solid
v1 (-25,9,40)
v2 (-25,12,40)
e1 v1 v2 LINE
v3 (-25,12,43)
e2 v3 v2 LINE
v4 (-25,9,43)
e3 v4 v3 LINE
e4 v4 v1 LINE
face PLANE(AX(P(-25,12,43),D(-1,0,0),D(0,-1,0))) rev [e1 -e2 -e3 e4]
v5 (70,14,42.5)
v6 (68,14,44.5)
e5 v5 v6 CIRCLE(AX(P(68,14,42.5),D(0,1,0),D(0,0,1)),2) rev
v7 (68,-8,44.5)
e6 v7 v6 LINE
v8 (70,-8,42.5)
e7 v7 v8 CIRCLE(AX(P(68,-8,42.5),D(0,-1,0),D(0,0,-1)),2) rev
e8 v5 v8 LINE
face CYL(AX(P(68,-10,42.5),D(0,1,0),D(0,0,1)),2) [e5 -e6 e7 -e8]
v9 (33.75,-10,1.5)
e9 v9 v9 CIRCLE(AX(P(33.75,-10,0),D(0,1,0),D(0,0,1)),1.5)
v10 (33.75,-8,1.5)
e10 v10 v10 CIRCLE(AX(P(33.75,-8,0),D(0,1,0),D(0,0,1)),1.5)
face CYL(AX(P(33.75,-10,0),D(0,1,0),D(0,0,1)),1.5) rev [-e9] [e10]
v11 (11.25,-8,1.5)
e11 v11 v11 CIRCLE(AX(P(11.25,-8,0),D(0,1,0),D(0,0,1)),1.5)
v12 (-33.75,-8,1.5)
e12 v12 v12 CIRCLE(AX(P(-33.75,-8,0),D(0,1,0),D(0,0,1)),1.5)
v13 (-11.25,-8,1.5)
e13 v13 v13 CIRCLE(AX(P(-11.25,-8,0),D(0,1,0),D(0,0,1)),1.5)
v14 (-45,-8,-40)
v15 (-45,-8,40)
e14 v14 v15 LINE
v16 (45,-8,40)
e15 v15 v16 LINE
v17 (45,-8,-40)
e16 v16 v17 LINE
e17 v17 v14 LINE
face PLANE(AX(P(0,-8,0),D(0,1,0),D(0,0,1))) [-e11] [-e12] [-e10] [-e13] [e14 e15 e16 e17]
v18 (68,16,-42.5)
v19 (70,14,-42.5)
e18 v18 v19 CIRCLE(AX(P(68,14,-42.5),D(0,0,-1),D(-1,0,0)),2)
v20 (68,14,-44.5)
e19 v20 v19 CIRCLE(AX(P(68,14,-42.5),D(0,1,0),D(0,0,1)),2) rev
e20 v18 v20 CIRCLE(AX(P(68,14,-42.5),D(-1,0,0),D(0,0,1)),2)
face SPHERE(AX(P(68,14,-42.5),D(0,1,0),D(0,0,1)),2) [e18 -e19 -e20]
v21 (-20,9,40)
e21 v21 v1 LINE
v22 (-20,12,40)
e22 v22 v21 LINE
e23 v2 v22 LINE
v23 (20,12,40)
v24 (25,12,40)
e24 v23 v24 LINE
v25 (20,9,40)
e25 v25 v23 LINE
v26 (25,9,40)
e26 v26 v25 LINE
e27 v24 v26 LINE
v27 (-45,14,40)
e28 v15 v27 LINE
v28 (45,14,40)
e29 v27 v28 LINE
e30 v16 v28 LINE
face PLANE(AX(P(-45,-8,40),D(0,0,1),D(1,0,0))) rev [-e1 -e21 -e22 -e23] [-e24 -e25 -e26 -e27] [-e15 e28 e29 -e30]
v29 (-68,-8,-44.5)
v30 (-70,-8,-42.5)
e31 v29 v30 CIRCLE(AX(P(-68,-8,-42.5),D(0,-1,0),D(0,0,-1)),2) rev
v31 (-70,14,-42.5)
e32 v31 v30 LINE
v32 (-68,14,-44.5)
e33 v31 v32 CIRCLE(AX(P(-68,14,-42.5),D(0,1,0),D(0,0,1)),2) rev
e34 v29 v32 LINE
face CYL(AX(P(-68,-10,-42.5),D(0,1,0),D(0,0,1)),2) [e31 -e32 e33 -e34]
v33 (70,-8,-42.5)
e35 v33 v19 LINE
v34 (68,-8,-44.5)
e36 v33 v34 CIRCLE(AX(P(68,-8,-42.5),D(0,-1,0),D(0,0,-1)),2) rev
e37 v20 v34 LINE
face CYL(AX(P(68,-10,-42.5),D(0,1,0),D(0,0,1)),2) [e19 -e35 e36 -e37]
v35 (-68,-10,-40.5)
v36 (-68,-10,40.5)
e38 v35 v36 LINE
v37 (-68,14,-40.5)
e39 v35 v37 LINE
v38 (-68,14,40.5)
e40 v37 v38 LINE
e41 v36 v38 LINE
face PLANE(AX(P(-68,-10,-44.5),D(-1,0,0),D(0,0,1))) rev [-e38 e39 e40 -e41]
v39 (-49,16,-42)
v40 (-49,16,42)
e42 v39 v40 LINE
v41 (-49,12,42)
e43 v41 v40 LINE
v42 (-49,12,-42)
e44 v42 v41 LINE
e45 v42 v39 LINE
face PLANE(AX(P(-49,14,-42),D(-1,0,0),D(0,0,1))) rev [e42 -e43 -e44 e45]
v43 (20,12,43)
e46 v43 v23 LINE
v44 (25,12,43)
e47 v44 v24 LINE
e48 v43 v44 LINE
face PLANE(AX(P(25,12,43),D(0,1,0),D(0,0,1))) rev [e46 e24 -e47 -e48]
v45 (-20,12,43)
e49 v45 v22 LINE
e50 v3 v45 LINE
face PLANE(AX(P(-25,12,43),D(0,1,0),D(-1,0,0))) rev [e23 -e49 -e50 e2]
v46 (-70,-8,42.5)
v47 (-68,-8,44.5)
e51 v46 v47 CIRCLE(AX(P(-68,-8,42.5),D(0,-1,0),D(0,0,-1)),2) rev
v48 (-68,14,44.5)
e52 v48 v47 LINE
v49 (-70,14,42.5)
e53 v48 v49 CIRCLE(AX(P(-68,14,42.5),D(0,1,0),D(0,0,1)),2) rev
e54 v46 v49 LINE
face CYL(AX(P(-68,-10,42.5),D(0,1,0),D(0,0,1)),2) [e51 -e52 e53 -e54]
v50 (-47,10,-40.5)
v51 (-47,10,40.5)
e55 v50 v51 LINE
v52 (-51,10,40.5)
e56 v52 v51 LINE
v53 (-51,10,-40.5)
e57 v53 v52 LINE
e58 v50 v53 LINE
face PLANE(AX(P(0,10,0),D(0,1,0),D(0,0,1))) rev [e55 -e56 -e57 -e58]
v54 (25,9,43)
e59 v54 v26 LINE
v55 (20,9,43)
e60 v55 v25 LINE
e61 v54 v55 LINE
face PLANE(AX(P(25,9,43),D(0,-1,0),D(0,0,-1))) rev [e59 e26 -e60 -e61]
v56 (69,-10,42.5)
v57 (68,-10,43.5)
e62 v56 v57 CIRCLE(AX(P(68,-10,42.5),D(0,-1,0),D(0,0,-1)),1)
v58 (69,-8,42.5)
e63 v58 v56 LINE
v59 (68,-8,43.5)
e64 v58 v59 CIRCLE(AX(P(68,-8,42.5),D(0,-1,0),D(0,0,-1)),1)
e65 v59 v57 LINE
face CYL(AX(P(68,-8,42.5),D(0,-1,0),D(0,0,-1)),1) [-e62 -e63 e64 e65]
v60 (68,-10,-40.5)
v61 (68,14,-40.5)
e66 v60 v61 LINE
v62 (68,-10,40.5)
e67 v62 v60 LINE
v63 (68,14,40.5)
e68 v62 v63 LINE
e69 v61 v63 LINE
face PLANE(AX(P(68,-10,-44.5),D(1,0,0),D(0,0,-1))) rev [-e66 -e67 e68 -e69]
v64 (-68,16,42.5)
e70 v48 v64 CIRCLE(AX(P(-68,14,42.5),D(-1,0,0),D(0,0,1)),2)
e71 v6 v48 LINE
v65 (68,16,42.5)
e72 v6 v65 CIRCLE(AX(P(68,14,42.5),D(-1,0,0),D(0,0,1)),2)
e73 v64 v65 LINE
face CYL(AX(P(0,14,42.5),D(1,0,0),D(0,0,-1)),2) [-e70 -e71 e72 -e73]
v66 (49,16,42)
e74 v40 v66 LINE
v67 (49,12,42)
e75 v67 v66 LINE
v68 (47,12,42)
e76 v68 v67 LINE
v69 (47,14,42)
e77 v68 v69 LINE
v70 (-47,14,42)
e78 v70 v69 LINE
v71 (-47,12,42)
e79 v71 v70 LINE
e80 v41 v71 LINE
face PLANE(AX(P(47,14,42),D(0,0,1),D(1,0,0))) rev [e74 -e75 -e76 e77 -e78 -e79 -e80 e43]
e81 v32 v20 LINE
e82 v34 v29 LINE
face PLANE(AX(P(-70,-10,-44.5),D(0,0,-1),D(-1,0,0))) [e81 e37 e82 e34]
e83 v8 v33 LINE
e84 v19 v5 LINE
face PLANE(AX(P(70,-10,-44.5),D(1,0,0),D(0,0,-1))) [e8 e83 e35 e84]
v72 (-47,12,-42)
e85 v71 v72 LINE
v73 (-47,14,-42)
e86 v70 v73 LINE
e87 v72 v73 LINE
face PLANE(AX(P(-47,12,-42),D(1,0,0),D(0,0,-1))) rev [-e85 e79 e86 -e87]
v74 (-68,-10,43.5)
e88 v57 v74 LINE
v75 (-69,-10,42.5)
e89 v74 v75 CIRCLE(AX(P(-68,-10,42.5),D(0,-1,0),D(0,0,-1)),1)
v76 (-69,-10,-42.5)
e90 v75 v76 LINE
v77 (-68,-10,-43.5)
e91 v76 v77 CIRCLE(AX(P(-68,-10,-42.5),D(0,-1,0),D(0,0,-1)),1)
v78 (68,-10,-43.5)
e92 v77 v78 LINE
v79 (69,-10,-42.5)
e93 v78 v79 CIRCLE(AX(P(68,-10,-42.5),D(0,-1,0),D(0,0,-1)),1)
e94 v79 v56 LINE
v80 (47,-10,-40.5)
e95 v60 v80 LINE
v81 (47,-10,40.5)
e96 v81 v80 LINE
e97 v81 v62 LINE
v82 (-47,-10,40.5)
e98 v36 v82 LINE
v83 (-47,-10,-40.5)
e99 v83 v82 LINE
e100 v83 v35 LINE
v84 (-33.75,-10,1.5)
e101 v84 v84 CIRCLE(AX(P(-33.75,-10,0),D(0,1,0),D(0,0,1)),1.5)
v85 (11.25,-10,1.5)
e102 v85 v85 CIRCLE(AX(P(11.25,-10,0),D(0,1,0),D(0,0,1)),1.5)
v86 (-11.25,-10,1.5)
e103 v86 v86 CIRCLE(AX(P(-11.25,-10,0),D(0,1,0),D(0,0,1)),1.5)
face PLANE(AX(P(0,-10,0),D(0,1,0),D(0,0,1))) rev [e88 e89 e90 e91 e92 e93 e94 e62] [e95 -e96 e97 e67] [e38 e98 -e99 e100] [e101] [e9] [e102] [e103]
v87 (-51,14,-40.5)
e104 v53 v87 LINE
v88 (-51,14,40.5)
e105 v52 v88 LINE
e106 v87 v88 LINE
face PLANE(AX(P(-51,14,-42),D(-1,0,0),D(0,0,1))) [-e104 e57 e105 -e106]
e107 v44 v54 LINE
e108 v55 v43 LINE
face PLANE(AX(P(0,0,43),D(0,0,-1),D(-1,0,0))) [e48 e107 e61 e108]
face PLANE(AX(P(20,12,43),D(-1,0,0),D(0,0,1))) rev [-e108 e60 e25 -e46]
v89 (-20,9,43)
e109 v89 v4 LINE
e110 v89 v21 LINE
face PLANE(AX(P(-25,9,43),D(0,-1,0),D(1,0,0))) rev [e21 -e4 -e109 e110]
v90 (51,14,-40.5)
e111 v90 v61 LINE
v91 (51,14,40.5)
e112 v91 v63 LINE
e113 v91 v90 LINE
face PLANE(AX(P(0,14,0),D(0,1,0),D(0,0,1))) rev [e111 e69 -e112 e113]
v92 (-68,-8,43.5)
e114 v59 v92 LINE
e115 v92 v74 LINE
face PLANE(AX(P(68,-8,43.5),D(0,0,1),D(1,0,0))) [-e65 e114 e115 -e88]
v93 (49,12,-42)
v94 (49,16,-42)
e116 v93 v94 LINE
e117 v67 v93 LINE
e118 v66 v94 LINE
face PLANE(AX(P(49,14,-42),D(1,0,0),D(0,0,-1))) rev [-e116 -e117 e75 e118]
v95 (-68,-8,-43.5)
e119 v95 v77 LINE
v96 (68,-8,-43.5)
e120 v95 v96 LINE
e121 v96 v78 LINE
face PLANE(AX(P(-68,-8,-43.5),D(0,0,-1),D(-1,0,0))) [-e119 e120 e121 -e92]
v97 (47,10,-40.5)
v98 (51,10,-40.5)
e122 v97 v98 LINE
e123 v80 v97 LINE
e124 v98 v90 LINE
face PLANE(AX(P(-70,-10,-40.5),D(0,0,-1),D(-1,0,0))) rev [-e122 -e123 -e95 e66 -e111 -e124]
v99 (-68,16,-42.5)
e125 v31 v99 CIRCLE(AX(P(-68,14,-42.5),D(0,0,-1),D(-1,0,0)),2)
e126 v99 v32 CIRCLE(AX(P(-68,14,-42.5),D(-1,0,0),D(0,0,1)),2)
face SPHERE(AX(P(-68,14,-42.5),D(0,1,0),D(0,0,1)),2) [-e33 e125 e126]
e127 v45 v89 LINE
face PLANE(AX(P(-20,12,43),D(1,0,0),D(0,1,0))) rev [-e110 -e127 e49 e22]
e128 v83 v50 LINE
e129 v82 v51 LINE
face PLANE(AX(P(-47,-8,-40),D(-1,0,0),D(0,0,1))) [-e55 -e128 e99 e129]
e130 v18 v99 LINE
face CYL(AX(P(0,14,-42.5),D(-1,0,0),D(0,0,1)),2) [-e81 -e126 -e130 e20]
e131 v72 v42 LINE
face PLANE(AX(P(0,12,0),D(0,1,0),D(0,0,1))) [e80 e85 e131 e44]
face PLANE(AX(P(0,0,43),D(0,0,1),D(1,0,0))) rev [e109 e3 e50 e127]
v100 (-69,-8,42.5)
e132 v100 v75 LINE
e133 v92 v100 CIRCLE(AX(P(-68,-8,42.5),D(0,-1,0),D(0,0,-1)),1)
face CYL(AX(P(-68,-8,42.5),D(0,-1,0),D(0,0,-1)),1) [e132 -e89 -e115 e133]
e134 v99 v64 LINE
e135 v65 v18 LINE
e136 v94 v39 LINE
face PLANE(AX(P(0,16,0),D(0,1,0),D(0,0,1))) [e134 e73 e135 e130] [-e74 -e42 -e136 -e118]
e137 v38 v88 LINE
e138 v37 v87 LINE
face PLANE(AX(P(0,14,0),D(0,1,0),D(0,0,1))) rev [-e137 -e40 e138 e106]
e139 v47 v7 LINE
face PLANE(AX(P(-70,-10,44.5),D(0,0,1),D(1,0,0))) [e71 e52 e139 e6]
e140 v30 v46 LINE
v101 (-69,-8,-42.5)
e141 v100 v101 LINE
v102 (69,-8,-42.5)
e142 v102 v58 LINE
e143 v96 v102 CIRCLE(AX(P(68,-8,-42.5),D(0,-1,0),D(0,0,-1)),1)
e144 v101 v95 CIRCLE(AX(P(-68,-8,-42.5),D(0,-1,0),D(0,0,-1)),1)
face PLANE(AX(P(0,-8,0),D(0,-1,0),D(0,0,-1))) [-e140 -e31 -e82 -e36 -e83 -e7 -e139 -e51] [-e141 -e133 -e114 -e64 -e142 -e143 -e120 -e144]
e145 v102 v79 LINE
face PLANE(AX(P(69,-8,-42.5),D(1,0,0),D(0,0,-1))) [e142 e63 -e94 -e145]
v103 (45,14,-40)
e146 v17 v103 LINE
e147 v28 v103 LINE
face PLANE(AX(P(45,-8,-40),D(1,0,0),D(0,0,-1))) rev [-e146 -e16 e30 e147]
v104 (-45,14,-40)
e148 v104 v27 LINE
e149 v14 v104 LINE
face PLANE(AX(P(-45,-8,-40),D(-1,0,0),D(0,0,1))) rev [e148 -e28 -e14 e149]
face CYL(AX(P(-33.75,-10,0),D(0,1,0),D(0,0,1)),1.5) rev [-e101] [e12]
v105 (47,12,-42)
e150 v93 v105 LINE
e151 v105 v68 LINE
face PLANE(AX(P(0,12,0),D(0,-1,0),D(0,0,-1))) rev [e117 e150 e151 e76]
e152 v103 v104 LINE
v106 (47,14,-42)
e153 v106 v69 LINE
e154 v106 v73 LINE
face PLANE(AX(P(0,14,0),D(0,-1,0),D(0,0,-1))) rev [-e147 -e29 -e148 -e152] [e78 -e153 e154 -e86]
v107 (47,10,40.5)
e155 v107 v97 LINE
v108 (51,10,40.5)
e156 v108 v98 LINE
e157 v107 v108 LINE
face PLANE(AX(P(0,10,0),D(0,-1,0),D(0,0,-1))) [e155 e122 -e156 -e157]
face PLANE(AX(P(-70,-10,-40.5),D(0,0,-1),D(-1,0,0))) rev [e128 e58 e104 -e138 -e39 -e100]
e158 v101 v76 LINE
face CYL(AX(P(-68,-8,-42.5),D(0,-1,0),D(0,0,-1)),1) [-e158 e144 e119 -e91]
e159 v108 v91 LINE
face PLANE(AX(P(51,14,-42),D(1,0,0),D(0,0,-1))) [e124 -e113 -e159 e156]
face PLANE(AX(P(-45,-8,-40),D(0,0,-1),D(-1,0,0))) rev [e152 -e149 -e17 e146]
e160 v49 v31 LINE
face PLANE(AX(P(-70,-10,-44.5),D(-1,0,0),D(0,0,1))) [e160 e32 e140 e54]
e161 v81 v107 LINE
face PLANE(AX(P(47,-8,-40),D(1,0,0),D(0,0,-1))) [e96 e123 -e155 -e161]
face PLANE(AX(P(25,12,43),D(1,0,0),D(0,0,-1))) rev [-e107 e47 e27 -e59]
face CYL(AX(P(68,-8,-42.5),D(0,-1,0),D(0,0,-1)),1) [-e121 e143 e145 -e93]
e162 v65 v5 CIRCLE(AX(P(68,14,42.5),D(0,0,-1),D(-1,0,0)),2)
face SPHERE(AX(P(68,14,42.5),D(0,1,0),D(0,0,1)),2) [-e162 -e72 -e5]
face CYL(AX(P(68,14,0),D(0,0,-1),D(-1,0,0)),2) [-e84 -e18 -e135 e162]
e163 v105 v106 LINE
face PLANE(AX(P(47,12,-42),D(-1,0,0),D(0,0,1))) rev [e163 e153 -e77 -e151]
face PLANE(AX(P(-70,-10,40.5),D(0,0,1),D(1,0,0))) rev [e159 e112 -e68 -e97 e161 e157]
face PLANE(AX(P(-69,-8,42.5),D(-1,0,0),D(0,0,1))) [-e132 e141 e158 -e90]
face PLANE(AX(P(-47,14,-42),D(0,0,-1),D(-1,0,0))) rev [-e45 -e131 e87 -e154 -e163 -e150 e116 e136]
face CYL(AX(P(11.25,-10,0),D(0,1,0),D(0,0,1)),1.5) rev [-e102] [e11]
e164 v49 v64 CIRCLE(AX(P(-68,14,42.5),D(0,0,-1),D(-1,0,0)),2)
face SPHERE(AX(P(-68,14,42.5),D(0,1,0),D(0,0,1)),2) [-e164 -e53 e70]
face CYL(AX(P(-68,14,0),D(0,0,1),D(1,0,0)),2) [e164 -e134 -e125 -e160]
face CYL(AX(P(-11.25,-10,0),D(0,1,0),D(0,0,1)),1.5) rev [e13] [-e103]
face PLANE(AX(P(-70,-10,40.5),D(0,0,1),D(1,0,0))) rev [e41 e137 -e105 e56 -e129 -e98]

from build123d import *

# Parameters (mm, degrees)
BOSS_EXTRUDE1_DEPTH      = 16
BOSS_EXTRUDE1_DEPTH_BACK = 10
SKETCH1_W                = 140
SKETCH1_H                = 89
SKETCH2_W                = 94
SKETCH2_H                = 84
BOSS_EXTRUDE2_DEPTH      = 22
SKETCH3_W                = 90
SKETCH3_H                = 80
CUT_EXTRUDE2_DEPTH       = 24
SKETCH5_R                = 1.5
CUT_EXTRUDE4_DEPTH       = 2
FILLET1_R                = 2
FILLET2_R                = 2
CUT_EXTRUDE8_DEPTH       = 2
SKETCH10_W               = 5
SKETCH10_H               = 3
CUT_EXTRUDE9_DEPTH       = 3
SKETCH11_W               = 2
SKETCH11_H               = 84
CUT_EXTRUDE10_DEPTH      = 2
SHELL1_START             = -68
SHELL1_OUTLINE_W         = 20
SHELL1_OUTLINE_H         = 81
SHELL1_DEPTH             = 21
SHELL1_START_2           = 47
SHELL1_2_OUTLINE_W       = 20
SHELL1_2_OUTLINE_H       = 81
SHELL1_2_DEPTH           = 21
SHELL1_3_OUTLINE_W       = 4
SHELL1_3_OUTLINE_H       = 81
SHELL1_3_DEPTH           = 17
SHELL1_START_3           = 51
SHELL1_4_OUTLINE_W       = 4
SHELL1_4_OUTLINE_H       = 81
SHELL1_4_DEPTH           = 17
SKETCH7_OUTSIDE_W        = 175.584
SKETCH7_OUTSIDE_H        = 124.584
CUT_EXTRUDE6_DEPTH       = 2


# Read off the part's stored shape, not the designer's step: Shell1
with BuildPart() as part:
    # Sketch1 → Boss-Extrude1 (new, two sides: drawn at the far end of the back side and taken through both)
    with BuildSketch(Plane(origin=(0, 0, 0), x_dir=(1, 0, 0), z_dir=(0, 1, 0)).offset(-BOSS_EXTRUDE1_DEPTH_BACK)):
        Rectangle(SKETCH1_W, SKETCH1_H)
    extrude(amount=BOSS_EXTRUDE1_DEPTH + BOSS_EXTRUDE1_DEPTH_BACK)

    # Sketch2 → Boss-Extrude2 (add)
    with BuildSketch(Plane(origin=(0, 16, 0), x_dir=(1, 0, 0), z_dir=(0, 1, 0))):
        Rectangle(SKETCH2_W, SKETCH2_H)
    extrude(amount=-BOSS_EXTRUDE2_DEPTH)

    # Sketch3 → Cut-Extrude2 (cut)
    with BuildSketch(Plane(origin=(0, 16, 0), x_dir=(1, 0, 0), z_dir=(0, 1, 0))):
        Rectangle(SKETCH3_W, SKETCH3_H)
    extrude(amount=-CUT_EXTRUDE2_DEPTH, mode=Mode.SUBTRACT)

    # Sketch5 → Cut-Extrude4 (cut)
    with BuildSketch(Plane(origin=(0, -8, 0), x_dir=(1, 0, 0), z_dir=(0, 1, 0))):
        with Locations(Location((-33.75, 0, 0), (0, 0, 270))):
            Circle(SKETCH5_R)
        with Locations(Location((-11.25, 0, 0), (0, 0, 270))):
            Circle(SKETCH5_R)
        with Locations(Location((11.25, 0, 0), (0, 0, 270))):
            Circle(SKETCH5_R)
        with Locations(Location((33.75, 0, 0), (0, 0, 270))):
            Circle(SKETCH5_R)
    extrude(amount=-CUT_EXTRUDE4_DEPTH, mode=Mode.SUBTRACT)

    # Fillet1
    fillet1_edges = [part.edges().sort_by_distance(p)[0] for p in [
        (70, 3, 44.5),
        (-70, 3, 44.5),
        (-70, 3, -44.5),
        (70, 3, -44.5),
    ]]
    fillet(fillet1_edges, radius=FILLET1_R)

    # Fillet2
    fillet2_edges = [part.edges().sort_by_distance(p)[0] for p in [
        (-70, 16, 0),
        (70, 16, 0),
        (0, 16, -44.5),
        (0, 16, 44.5),
        (69.414213562, 16, 43.914213562),
        (69.414213562, 16, -43.914213562),
        (-69.414213562, 16, -43.914213562),
        (-69.414213562, 16, 43.914213562),
    ]]
    fillet(fillet2_edges, radius=FILLET2_R)

    # Sketch8 → Cut-Extrude8 (cut)
    with BuildSketch(Plane(origin=(0, 16, 0), x_dir=(1, 0, 0), z_dir=(0, 1, 0))):
        Polygon((-47, 42), (-49, 42), (-49, -42), (-47, -42), (47, -42), (49, -42), (49, 42), (47, 42), align=None)
    extrude(amount=-CUT_EXTRUDE8_DEPTH, mode=Mode.SUBTRACT)

    # Sketch10 → Cut-Extrude9 (cut)
    with BuildSketch(Plane(origin=(0, 0, 40), x_dir=(-1, 0, 0), z_dir=(0, 0, -1))):
        with Locations((-22.5, 10.5)):
            Rectangle(SKETCH10_W, SKETCH10_H)
        with Locations((22.5, 10.5)):
            Rectangle(SKETCH10_W, SKETCH10_H)
    extrude(amount=-CUT_EXTRUDE9_DEPTH, mode=Mode.SUBTRACT)

    # Sketch11 → Cut-Extrude10 (cut)
    with BuildSketch(Plane(origin=(0, 14, 0), x_dir=(1, 0, 0), z_dir=(0, 1, 0))):
        with Locations((-48, 0)):
            Rectangle(SKETCH11_W, SKETCH11_H)
        with Locations((48, 0)):
            Rectangle(SKETCH11_W, SKETCH11_H)
    extrude(amount=-CUT_EXTRUDE10_DEPTH, mode=Mode.SUBTRACT)

    # Shell1 outline → Shell1 (cut)
    with BuildSketch(Plane.YZ.offset(SHELL1_START)):
        Rectangle(SHELL1_OUTLINE_W, SHELL1_OUTLINE_H)
    extrude(amount=SHELL1_DEPTH, mode=Mode.SUBTRACT)

    # Shell1 2 outline → Shell1 2 (cut)
    with BuildSketch(Plane.YZ.offset(SHELL1_START_2)):
        Rectangle(SHELL1_2_OUTLINE_W, SHELL1_2_OUTLINE_H)
    extrude(amount=SHELL1_2_DEPTH, mode=Mode.SUBTRACT)

    # Shell1 3 outline → Shell1 3 (cut)
    with BuildSketch(Plane.YZ.offset(SHELL1_START)):
        with Locations((12, 0)):
            Rectangle(SHELL1_3_OUTLINE_W, SHELL1_3_OUTLINE_H)
    extrude(amount=SHELL1_3_DEPTH, mode=Mode.SUBTRACT)

    # Shell1 4 outline → Shell1 4 (cut)
    with BuildSketch(Plane.YZ.offset(SHELL1_START_3)):
        with Locations((12, 0)):
            Rectangle(SHELL1_4_OUTLINE_W, SHELL1_4_OUTLINE_H)
    extrude(amount=SHELL1_4_DEPTH, mode=Mode.SUBTRACT)

    # Sketch7 outside → Cut-Extrude6 (cut)
    with BuildSketch(Plane.XZ.offset(10)):
        Rectangle(SKETCH7_OUTSIDE_W, SKETCH7_OUTSIDE_H)
        with BuildLine():
            Line((-68, -43.5), (68, -43.5))
            ThreePointArc((68, -43.5), (68.707106781, -43.207106781), (69, -42.5))
            Line((69, -42.5), (69, 42.5))
            ThreePointArc((69, 42.5), (68.707106781, 43.207106781), (68, 43.5))
            Line((68, 43.5), (-68, 43.5))
            ThreePointArc((-68, 43.5), (-68.707106781, 43.207106781), (-69, 42.5))
            Line((-69, 42.5), (-69, -42.5))
            ThreePointArc((-69, -42.5), (-68.707106781, -43.207106781), (-68, -43.5))
        make_face(mode=Mode.SUBTRACT)
    extrude(amount=-CUT_EXTRUDE6_DEPTH, mode=Mode.SUBTRACT)


solid = part.part
